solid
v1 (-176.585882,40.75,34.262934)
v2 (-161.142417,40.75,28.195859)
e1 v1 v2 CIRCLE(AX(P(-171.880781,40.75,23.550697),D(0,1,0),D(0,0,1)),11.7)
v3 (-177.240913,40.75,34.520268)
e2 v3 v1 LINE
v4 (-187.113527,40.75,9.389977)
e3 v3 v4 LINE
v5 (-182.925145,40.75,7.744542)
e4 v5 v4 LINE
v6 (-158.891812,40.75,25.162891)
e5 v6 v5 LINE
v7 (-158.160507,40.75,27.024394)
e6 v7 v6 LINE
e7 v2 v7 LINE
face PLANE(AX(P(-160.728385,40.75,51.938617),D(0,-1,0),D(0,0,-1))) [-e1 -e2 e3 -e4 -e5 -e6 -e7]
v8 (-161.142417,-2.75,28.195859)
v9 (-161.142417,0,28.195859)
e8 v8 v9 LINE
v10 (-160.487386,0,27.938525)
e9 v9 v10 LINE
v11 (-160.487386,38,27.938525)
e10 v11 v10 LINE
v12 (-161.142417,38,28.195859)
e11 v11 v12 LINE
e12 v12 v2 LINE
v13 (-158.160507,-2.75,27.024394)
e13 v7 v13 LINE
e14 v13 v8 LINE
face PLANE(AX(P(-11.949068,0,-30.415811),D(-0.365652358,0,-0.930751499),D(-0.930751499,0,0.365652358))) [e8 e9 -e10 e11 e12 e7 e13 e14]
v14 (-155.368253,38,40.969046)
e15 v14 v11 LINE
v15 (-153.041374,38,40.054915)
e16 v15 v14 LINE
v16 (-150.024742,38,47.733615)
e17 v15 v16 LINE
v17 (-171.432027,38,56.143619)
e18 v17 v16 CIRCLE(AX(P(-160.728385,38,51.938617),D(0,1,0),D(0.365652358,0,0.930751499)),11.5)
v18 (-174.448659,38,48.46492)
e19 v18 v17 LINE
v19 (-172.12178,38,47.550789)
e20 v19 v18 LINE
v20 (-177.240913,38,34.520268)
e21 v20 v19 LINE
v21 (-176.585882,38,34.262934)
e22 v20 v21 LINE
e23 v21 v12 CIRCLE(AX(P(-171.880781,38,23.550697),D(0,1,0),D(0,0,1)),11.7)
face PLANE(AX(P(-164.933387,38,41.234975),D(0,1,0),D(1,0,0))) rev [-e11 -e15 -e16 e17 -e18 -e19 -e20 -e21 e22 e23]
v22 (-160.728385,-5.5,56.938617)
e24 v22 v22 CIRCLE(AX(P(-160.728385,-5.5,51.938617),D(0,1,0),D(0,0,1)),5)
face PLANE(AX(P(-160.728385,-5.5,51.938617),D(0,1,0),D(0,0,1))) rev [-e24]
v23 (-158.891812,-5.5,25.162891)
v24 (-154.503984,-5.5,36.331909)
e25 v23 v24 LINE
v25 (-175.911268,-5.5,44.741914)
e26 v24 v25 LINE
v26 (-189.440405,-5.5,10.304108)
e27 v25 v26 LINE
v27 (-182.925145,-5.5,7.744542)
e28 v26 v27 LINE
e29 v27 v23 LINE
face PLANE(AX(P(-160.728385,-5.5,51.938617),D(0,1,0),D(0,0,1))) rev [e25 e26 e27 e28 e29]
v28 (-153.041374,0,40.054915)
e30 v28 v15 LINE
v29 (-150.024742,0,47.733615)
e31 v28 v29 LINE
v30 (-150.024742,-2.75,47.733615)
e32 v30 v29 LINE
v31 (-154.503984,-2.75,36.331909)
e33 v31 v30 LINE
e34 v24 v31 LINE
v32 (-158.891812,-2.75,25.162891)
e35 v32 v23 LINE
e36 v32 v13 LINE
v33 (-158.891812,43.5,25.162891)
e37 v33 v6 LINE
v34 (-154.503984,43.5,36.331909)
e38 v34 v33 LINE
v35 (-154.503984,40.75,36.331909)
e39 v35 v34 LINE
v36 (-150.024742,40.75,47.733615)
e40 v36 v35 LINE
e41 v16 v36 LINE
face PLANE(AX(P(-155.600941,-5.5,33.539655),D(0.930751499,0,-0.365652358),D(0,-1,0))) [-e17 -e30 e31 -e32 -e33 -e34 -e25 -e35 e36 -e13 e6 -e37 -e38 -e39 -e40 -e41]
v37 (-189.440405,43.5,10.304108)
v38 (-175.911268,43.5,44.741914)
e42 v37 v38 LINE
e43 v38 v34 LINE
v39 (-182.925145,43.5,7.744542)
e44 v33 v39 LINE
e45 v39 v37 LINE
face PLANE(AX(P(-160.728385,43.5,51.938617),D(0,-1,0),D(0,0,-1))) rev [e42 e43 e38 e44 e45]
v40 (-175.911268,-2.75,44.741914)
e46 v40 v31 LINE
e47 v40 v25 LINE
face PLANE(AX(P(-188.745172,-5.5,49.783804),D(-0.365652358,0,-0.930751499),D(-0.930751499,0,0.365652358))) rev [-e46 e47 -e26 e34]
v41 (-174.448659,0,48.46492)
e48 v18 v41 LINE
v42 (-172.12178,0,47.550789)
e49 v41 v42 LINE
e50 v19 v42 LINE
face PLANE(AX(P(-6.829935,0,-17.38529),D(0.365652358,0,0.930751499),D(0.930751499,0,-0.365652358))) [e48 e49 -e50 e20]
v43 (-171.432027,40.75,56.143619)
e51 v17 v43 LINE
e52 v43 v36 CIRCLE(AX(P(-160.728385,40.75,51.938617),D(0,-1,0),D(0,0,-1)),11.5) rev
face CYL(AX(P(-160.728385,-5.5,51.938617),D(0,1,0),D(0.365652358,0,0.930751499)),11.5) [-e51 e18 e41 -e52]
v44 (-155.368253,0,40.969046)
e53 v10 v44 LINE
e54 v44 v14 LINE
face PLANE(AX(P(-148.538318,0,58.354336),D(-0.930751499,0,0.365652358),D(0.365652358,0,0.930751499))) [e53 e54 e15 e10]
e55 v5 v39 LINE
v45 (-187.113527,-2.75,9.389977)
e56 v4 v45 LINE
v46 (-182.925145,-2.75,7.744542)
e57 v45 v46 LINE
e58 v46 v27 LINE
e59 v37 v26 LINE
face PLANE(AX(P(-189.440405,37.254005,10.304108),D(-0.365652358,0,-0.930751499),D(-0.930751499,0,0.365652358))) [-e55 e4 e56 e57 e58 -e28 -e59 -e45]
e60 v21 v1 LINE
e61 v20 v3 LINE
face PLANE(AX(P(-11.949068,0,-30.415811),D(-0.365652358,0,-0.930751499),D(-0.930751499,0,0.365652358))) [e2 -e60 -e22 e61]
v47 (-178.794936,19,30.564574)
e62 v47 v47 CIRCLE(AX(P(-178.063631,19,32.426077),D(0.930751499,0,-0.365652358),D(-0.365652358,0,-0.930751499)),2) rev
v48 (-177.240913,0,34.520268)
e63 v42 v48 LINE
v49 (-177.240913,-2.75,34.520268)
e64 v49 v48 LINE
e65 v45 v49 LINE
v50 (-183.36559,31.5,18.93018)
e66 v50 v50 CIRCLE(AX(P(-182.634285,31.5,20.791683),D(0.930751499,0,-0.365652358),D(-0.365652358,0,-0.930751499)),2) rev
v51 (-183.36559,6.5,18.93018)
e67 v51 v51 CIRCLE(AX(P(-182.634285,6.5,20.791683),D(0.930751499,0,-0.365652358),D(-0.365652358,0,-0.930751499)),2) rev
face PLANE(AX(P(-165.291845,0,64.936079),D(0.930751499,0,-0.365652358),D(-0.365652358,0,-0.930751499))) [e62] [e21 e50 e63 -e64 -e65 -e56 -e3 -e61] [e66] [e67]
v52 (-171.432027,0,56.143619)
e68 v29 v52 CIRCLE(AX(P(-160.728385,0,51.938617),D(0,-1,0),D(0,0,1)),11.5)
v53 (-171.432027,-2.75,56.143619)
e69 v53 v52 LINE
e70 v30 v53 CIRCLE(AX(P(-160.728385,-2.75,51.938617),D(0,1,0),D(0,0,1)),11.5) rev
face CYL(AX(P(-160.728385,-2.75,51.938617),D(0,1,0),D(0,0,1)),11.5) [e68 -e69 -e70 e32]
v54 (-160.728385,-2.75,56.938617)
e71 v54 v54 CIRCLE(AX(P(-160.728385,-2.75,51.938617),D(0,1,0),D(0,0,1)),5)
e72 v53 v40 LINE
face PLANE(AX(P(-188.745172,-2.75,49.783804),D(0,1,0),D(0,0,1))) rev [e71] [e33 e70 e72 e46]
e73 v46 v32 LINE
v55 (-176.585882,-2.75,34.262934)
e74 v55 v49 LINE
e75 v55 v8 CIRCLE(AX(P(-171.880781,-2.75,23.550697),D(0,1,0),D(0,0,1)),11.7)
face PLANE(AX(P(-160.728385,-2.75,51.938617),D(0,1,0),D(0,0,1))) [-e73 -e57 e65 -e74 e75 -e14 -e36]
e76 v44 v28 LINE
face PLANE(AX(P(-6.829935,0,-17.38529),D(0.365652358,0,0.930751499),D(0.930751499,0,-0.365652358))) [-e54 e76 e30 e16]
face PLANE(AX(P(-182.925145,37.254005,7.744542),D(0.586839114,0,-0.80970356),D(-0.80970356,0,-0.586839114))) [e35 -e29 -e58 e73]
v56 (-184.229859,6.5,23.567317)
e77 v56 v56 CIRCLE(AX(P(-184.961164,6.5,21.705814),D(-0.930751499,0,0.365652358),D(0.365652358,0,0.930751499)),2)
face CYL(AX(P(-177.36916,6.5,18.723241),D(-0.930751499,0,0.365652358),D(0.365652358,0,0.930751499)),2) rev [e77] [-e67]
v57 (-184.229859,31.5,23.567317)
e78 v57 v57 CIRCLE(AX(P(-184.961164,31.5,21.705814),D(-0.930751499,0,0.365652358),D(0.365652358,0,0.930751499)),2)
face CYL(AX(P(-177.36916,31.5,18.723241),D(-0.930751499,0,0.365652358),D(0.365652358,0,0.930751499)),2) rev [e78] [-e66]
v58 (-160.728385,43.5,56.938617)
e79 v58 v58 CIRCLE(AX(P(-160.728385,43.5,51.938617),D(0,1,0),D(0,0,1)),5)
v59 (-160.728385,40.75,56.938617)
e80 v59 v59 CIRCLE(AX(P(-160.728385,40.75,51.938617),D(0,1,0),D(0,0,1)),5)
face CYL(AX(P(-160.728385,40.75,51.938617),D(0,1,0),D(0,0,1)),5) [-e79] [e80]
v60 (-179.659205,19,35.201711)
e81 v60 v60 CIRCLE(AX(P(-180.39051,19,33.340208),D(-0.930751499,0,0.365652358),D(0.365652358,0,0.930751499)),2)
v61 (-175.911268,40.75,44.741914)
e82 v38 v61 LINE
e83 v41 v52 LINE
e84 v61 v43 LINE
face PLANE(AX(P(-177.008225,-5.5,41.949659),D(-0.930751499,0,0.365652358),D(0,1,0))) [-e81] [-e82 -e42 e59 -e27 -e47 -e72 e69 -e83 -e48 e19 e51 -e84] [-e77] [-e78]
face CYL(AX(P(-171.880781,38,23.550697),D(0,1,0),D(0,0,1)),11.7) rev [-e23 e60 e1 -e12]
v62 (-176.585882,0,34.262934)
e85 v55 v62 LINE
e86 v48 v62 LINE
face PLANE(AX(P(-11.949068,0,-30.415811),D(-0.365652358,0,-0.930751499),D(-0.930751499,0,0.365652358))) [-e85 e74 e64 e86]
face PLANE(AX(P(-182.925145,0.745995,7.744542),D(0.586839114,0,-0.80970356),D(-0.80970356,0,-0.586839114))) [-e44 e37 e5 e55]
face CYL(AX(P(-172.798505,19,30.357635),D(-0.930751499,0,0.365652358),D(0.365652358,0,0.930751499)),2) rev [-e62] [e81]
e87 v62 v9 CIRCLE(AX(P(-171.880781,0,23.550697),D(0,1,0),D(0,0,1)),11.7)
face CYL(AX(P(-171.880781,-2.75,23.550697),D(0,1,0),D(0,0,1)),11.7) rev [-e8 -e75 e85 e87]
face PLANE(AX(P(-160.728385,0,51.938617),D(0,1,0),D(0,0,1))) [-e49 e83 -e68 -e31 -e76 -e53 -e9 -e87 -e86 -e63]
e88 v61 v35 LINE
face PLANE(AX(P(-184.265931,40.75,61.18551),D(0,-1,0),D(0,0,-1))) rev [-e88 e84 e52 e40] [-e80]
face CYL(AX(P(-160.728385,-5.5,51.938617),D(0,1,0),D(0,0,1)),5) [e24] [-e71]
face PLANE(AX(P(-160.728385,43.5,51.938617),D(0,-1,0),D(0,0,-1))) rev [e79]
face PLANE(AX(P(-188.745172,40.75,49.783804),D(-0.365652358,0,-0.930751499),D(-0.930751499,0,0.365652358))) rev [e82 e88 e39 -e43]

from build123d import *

# Parameters (mm, degrees)
SALIENTE_EXTRUIR1_START   = -2.75
SALIENTE_EXTRUIR1_DEPTH   = 5.5
SALIENTE_EXTRUIR1_2_DEPTH = 2.75
SALIENTE_EXTRUIR2_DEPTH   = 38
SALIENTE_EXTRUIR3_START   = 2.75
SALIENTE_EXTRUIR3_DEPTH   = 2.75
CROQUIS4_W                = 23
CROQUIS4_H                = 43.5
CORTAR_EXTRUIR1_DEPTH     = 8.25
CORTAR_EXTRUIR2_DEPTH     = 2.75
CROQUIS6_W                = 38
CROQUIS6_H                = 22.249999999
CORTAR_EXTRUIR3_DEPTH     = 16.59246817
CROQUIS7_W                = 3.203765914
CROQUIS7_H                = 38
CORTAR_EXTRUIR4_DEPTH     = 8.25
CROQUIS8_W                = 3.203765916
CROQUIS8_H                = 38
CORTAR_EXTRUIR5_DEPTH     = 8.25
CROQUIS9_W                = 14
CROQUIS9_H                = 38
CORTAR_EXTRUIR6_DEPTH     = 0.703765915
CROQUIS10_W               = 14
CROQUIS10_H               = 38
CORTAR_EXTRUIR7_DEPTH     = 0.703765915
SALIENTE_EXTRUIR4_START   = 2.75
SALIENTE_EXTRUIR4_DEPTH   = 2.75
CORTAR_EXTRUIR8_DEPTH     = 2.75
CROQUIS13_W               = 12.249999999
CROQUIS13_H               = 2.75
CORTAR_EXTRUIR9_DEPTH     = 74.034358614
CROQUIS14_W               = 12.249999999
CROQUIS14_H               = 2.75
CORTAR_EXTRUIR10_DEPTH    = 74.034358614
CROQUIS15_W               = 5
CROQUIS15_H               = 2.75
CROQUIS16_W               = 5
CROQUIS16_H               = 2.75
TALADRO1_D                = 10.15
TALADRO1_DEPTH            = 2.75
TALADRO2_D                = 10.15
CORTAR_EXTRUIR11_DEPTH    = 2.75
CORTAR_EXTRUIR12_START    = -2.75
CORTAR_EXTRUIR12_DEPTH    = 2.75
CORTAR_EXTRUIR13_REACH    = 202.135
SALIENTE_EXTRUIR5_DEPTH   = 2.75
SALIENTE_EXTRUIR6_DEPTH   = 2.75
CROQUIS26_W               = 27
CROQUIS26_H               = 43.5
SALIENTE_EXTRUIR7_DEPTH   = 2.5
CROQUIS27_R               = 2
CORTAR_EXTRUIR14_DEPTH    = 2.5


with BuildPart() as part:
    # Saliente-Extruir1: read off the stored shape, not the designer's step
    # Saliente-Extruir1 outline → Saliente-Extruir1 (new body)
    with BuildSketch(Plane(origin=(0, 40.75, 0), x_dir=(-1, 0, 0), z_dir=(0, 1, 0)).offset(SALIENTE_EXTRUIR1_START)):
        with BuildLine():
            Line((161.177139208, 19.345694485), (182.584423689, 27.755698719))
            Line((182.584423689, 27.755698719), (171.432026769, 56.143619441))
            ThreePointArc((171.432026769, 56.143619441), (156.523382412, 62.642259564), (150.024742289, 47.733615207))
            Line((150.024742289, 47.733615207), (161.177139208, 19.345694485))
        make_face()
    extrude(amount=SALIENTE_EXTRUIR1_DEPTH)

    # Saliente-Extruir1 2 outline → Saliente-Extruir1 2 (add)
    with BuildSketch(Plane(origin=(0, 40.75, 0), x_dir=(-1, 0, 0), z_dir=(0, 1, 0))):
        with BuildLine():
            ThreePointArc((161.177139208, 19.345694485), (176.085783565, 12.847054362), (182.584423687, 27.755698719))
            Line((182.584423687, 27.755698719), (161.177139208, 19.345694485))
        make_face()
    extrude(amount=SALIENTE_EXTRUIR1_2_DEPTH)

    # Croquis2 → Saliente-Extruir2 (add)
    with BuildSketch(Plane.XZ.offset(-38)):
        Polygon((-171.432026768, 56.143619442), (-150.024742288, 47.733615205), (-161.177139209, 19.345694483), (-182.584423689, 27.755698719), align=None)
    extrude(amount=SALIENTE_EXTRUIR2_DEPTH)

    # Croquis3 → Saliente-Extruir3 (add)
    with BuildSketch(Plane.XZ.offset(SALIENTE_EXTRUIR3_START)):
        with BuildLine():
            Line((-182.584423688, 27.755698719), (-171.432026768, 56.143619441))
            ThreePointArc((-171.432026768, 56.143619441), (-156.523382412, 62.642259564), (-150.024742289, 47.733615207))
            Line((-150.024742289, 47.733615207), (-161.177139208, 19.345694485))
            Line((-161.177139208, 19.345694485), (-182.584423688, 27.755698719))
        make_face()
    extrude(amount=-SALIENTE_EXTRUIR3_DEPTH)

    # Croquis4 → Cortar-Extruir1 (cut)
    with BuildSketch(Plane(origin=(-14.965700114, 0, -38.094511116), x_dir=(-0.9307514991056489, 0, 0.3656523580022251), z_dir=(-0.3656523580022251, 0, -0.9307514991056489))):
        with Locations((168.589662745, 19)):
            Rectangle(CROQUIS4_W, CROQUIS4_H)
    extrude(amount=-CORTAR_EXTRUIR1_DEPTH, mode=Mode.SUBTRACT)

    # Croquis5 → Cortar-Extruir2 (cut)
    with BuildSketch(Plane(origin=(0, 40.75, 0), x_dir=(1, 0, 0), z_dir=(0, 1, 0))):
        with BuildLine():
            Line((-161.142417183, -28.195858914), (-176.585881806, -34.262934025))
            ThreePointArc((-176.585881806, -34.262934025), (-167.602648859, -34.440489141), (-161.142417183, -28.195858914))
        make_face()
    extrude(amount=-CORTAR_EXTRUIR2_DEPTH, mode=Mode.SUBTRACT)

    # Croquis6 → Cortar-Extruir3 (cut)
    with BuildSketch(Plane(origin=(-149.193349022, 0, 58.611670162), x_dir=(0, 1, 0), z_dir=(0.9307514991056486, 0, -0.3656523580022258))):
        with Locations((19, -21.553766865)):
            Rectangle(CROQUIS6_W, CROQUIS6_H)
    extrude(amount=-CORTAR_EXTRUIR3_DEPTH, mode=Mode.SUBTRACT)

    # Croquis7 → Cortar-Extruir4 (cut)
    with BuildSketch(Plane(origin=(-3.8133032, 0, -9.706590403), x_dir=(0.9307514990825102, 0, -0.36565235806112356), z_dir=(0.36565235806112356, 0, 0.9307514990825102))):
        with Locations((-158.691545702, 19)):
            Rectangle(CROQUIS7_W, CROQUIS7_H)
    extrude(amount=-CORTAR_EXTRUIR4_DEPTH, mode=Mode.SUBTRACT)

    # Croquis8 → Cortar-Extruir5 (cut)
    with BuildSketch(Plane(origin=(-3.8133032, 0, -9.706590403), x_dir=(0.9307514990825102, 0, -0.36565235806112356), z_dir=(0.36565235806112356, 0, 0.9307514990825102))):
        with Locations((-178.487779787, 19)):
            Rectangle(CROQUIS8_W, CROQUIS8_H)
    extrude(amount=-CORTAR_EXTRUIR5_DEPTH, mode=Mode.SUBTRACT)

    # Croquis9 → Cortar-Extruir6 (cut)
    with BuildSketch(Plane(origin=(-164.636813645, 0, 64.678745273), x_dir=(-0.3656523580022247, 0, -0.930751499105649), z_dir=(0.930751499105649, 1.4355340193330324e-15, -0.3656523580022247))):
        with Locations((25.678766864, 19)):
            Rectangle(CROQUIS9_W, CROQUIS9_H)
    extrude(amount=-CORTAR_EXTRUIR6_DEPTH, mode=Mode.SUBTRACT)

    # Croquis10 → Cortar-Extruir7 (cut)
    with BuildSketch(Plane(origin=(-149.193349022, 0, 58.611670162), x_dir=(0.3656523580022248, 0, 0.930751499105649), z_dir=(-0.930751499105649, -1.4355340193330322e-15, 0.3656523580022248))):
        with Locations((-25.678766864, 19)):
            Rectangle(CROQUIS10_W, CROQUIS10_H)
    extrude(amount=-CORTAR_EXTRUIR7_DEPTH, mode=Mode.SUBTRACT)

    # Croquis11 → Saliente-Extruir4 (add)
    with BuildSketch(Plane.XZ.offset(2.75).offset(SALIENTE_EXTRUIR4_START)):
        with BuildLine():
            Line((-150.024742289, 47.733615207), (-161.177139208, 19.345694485))
            ThreePointArc((-161.177139208, 19.345694485), (-176.085783565, 12.847054362), (-182.584423687, 27.755698719))
            Line((-182.584423687, 27.755698719), (-171.432026769, 56.143619441))
            ThreePointArc((-171.432026769, 56.143619441), (-156.523382412, 62.642259564), (-150.024742289, 47.733615207))
        make_face()
    extrude(amount=-SALIENTE_EXTRUIR4_DEPTH)

    # Croquis12 → Cortar-Extruir8 (cut)
    with BuildSketch(Plane(origin=(0, 0, 0), x_dir=(-1, 0, 0), z_dir=(0, 1, 0))):
        with BuildLine():
            Line((161.142417183, 28.195858914), (176.585881806, 34.262934025))
            ThreePointArc((176.585881806, 34.262934025), (167.602648859, 34.440489141), (161.142417183, 28.195858914))
        make_face()
    extrude(amount=-CORTAR_EXTRUIR8_DEPTH, mode=Mode.SUBTRACT)

    # Croquis13 → Cortar-Extruir9 (cut, through all)
    with BuildSketch(Plane(origin=(-146.211439094, 0, 57.440205601), x_dir=(-0.36565235800222584, 0, -0.9307514991056486), z_dir=(0.9307514991056486, 0, -0.36565235800222584))):
        with Locations((16.553766864, -4.125)):
            Rectangle(CROQUIS13_W, CROQUIS13_H)
    extrude(amount=-CORTAR_EXTRUIR9_DEPTH, mode=Mode.SUBTRACT)

    # Croquis14 → Cortar-Extruir10 (cut, through all)
    with BuildSketch(Plane(origin=(-146.211439094, 0, 57.440205601), x_dir=(-0.36565235800222584, 0, -0.9307514991056486), z_dir=(0.9307514991056486, 0, -0.36565235800222584))):
        with Locations((16.553766864, 42.125)):
            Rectangle(CROQUIS14_W, CROQUIS14_H)
    extrude(amount=-CORTAR_EXTRUIR10_DEPTH, mode=Mode.SUBTRACT)

    # Croquis15 → Revolución1 (revolve)
    with BuildSketch(Plane(origin=(0, 0, 51.938617325), x_dir=(-1, 0, 0), z_dir=(0, 0, -1))):
        with Locations((158.228384529, -4.125)):
            Rectangle(CROQUIS15_W, CROQUIS15_H)
    revolve(axis=Axis((-160.728384529, -5.5, 51.938617325), (0, 1, 0)))

    # Croquis16 → Revolución2 (revolve)
    with BuildSketch(Plane(origin=(0, 0, 51.938617325), x_dir=(-1, 0, 0), z_dir=(0, 0, -1))):
        with Locations((158.228384529, 42.125)):
            Rectangle(CROQUIS16_W, CROQUIS16_H)
    revolve(axis=Axis((-160.728384529, 40.75, 51.938617325), (0, 1, 0)))

    # Taladro1
    with Locations(Plane(origin=(0, -5.5, 0), x_dir=(-1, 0, 0), z_dir=(0, -1, 0))):
        with Locations((171.880781448, -23.550696602)):
            Hole(TALADRO1_D / 2, depth=TALADRO1_DEPTH)

    # Taladro2 (through all)
    with Locations(Plane(origin=(0, 40.75, 0), x_dir=(-1, 0, 0), z_dir=(0, -1, 0))):
        with Locations((171.880781448, -23.550696602)):
            Hole(TALADRO2_D / 2)

    # Croquis21 → Cortar-Extruir11 (cut)
    with BuildSketch(Plane.XZ.offset(5.5)):
        with BuildLine():
            ThreePointArc((-165.382142024, 53.766879114), (-158.900122739, 56.59237482), (-156.074627033, 50.110355534))
            Line((-156.074627033, 50.110355534), (-150.024742289, 47.733615207))
            ThreePointArc((-150.024742289, 47.733615207), (-156.523382412, 62.642259564), (-171.432026769, 56.143619441))
            Line((-171.432026769, 56.143619441), (-165.382142024, 53.766879114))
        make_face()
    extrude(amount=-CORTAR_EXTRUIR11_DEPTH, mode=Mode.SUBTRACT)

    # Croquis22 → Cortar-Extruir12 (cut)
    with BuildSketch(Plane(origin=(0, 43.5, 0), x_dir=(1, 0, 0), z_dir=(0, 1, 0)).offset(CORTAR_EXTRUIR12_START)):
        with BuildLine():
            ThreePointArc((-165.382142024, -53.766879115), (-158.900122739, -56.59237482), (-156.074627033, -50.110355534))
            Line((-156.074627033, -50.110355534), (-150.024742289, -47.733615207))
            ThreePointArc((-150.024742289, -47.733615207), (-156.523382412, -62.642259564), (-171.432026769, -56.143619442))
            Line((-171.432026769, -56.143619442), (-165.382142024, -53.766879115))
        make_face()
    extrude(amount=CORTAR_EXTRUIR12_DEPTH, mode=Mode.SUBTRACT)

    # Cortar-Extruir13: up to this face of the body (flat: up to its plane)
    cortar_extruir13_end = Plane(part.part.faces().sort_by_distance((-169.996704911, 43.5, 28.346528005))[0])
    # Croquis23 → Cortar-Extruir13 (cut, up to the picked face)
    with BuildSketch(Plane.XZ.offset(5.5), mode=Mode.PRIVATE) as cortar_extruir13_sk1:
        Polygon((-180.29909645, 33.572895588), (-158.891811971, 25.162891354), (-166.204859131, 6.547861372), (-187.61214361, 14.957865606), align=None)
    cortar_extruir13_tool1 = split(extrude(cortar_extruir13_sk1.sketch, amount=-CORTAR_EXTRUIR13_REACH, mode=Mode.PRIVATE), bisect_by=cortar_extruir13_end, keep=Keep.BOTH, mode=Mode.PRIVATE)
    add(cortar_extruir13_tool1.solids().sort_by(Axis((-173.251978, -5.5, 20.060378), (0, 1, 0)))[0], mode=Mode.SUBTRACT)

    # Croquis24 → Saliente-Extruir5 (add)
    with BuildSketch(Plane.XZ.offset(5.5)):
        Polygon((-180.29909645, 33.572895588), (-189.4404054, 10.304108111), (-182.925144906, 7.744541605), (-158.891811971, 25.162891354), align=None)
    extrude(amount=-SALIENTE_EXTRUIR5_DEPTH)

    # Croquis25 → Saliente-Extruir6 (add)
    with BuildSketch(Plane(origin=(0, 43.5, 0), x_dir=(1, 0, 0), z_dir=(0, 1, 0))):
        Polygon((-180.29909645, -33.572895588), (-189.4404054, -10.304108111), (-182.925144906, -7.744541605), (-158.891811971, -25.162891354), align=None)
    extrude(amount=-SALIENTE_EXTRUIR6_DEPTH)

    # Croquis26 → Saliente-Extruir7 (add)
    with BuildSketch(Plane(origin=(-167.618723573, 0, 65.850209835), x_dir=(0.36565235800222584, 0, 0.9307514991056486), z_dir=(-0.9307514991056486, 0, 0.36565235800222584))):
        with Locations((-46.178766864, 19)):
            Rectangle(CROQUIS26_W, CROQUIS26_H)
    extrude(amount=-SALIENTE_EXTRUIR7_DEPTH)

    # Croquis27 → Cortar-Extruir14 (cut)
    with BuildSketch(Plane(origin=(-167.618723573, 0, 65.850209835), x_dir=(0.36565235800222584, 0, 0.9307514991056486), z_dir=(-0.9307514991056486, 0, 0.36565235800222584))):
        with Locations((-47.428766864, 31.5)):
            Circle(CROQUIS27_R)
        with Locations((-47.428766864, 6.5)):
            Circle(CROQUIS27_R)
        with Locations((-34.928766864, 19)):
            Circle(CROQUIS27_R)
    extrude(amount=-CORTAR_EXTRUIR14_DEPTH, mode=Mode.SUBTRACT)


solid = part.part
